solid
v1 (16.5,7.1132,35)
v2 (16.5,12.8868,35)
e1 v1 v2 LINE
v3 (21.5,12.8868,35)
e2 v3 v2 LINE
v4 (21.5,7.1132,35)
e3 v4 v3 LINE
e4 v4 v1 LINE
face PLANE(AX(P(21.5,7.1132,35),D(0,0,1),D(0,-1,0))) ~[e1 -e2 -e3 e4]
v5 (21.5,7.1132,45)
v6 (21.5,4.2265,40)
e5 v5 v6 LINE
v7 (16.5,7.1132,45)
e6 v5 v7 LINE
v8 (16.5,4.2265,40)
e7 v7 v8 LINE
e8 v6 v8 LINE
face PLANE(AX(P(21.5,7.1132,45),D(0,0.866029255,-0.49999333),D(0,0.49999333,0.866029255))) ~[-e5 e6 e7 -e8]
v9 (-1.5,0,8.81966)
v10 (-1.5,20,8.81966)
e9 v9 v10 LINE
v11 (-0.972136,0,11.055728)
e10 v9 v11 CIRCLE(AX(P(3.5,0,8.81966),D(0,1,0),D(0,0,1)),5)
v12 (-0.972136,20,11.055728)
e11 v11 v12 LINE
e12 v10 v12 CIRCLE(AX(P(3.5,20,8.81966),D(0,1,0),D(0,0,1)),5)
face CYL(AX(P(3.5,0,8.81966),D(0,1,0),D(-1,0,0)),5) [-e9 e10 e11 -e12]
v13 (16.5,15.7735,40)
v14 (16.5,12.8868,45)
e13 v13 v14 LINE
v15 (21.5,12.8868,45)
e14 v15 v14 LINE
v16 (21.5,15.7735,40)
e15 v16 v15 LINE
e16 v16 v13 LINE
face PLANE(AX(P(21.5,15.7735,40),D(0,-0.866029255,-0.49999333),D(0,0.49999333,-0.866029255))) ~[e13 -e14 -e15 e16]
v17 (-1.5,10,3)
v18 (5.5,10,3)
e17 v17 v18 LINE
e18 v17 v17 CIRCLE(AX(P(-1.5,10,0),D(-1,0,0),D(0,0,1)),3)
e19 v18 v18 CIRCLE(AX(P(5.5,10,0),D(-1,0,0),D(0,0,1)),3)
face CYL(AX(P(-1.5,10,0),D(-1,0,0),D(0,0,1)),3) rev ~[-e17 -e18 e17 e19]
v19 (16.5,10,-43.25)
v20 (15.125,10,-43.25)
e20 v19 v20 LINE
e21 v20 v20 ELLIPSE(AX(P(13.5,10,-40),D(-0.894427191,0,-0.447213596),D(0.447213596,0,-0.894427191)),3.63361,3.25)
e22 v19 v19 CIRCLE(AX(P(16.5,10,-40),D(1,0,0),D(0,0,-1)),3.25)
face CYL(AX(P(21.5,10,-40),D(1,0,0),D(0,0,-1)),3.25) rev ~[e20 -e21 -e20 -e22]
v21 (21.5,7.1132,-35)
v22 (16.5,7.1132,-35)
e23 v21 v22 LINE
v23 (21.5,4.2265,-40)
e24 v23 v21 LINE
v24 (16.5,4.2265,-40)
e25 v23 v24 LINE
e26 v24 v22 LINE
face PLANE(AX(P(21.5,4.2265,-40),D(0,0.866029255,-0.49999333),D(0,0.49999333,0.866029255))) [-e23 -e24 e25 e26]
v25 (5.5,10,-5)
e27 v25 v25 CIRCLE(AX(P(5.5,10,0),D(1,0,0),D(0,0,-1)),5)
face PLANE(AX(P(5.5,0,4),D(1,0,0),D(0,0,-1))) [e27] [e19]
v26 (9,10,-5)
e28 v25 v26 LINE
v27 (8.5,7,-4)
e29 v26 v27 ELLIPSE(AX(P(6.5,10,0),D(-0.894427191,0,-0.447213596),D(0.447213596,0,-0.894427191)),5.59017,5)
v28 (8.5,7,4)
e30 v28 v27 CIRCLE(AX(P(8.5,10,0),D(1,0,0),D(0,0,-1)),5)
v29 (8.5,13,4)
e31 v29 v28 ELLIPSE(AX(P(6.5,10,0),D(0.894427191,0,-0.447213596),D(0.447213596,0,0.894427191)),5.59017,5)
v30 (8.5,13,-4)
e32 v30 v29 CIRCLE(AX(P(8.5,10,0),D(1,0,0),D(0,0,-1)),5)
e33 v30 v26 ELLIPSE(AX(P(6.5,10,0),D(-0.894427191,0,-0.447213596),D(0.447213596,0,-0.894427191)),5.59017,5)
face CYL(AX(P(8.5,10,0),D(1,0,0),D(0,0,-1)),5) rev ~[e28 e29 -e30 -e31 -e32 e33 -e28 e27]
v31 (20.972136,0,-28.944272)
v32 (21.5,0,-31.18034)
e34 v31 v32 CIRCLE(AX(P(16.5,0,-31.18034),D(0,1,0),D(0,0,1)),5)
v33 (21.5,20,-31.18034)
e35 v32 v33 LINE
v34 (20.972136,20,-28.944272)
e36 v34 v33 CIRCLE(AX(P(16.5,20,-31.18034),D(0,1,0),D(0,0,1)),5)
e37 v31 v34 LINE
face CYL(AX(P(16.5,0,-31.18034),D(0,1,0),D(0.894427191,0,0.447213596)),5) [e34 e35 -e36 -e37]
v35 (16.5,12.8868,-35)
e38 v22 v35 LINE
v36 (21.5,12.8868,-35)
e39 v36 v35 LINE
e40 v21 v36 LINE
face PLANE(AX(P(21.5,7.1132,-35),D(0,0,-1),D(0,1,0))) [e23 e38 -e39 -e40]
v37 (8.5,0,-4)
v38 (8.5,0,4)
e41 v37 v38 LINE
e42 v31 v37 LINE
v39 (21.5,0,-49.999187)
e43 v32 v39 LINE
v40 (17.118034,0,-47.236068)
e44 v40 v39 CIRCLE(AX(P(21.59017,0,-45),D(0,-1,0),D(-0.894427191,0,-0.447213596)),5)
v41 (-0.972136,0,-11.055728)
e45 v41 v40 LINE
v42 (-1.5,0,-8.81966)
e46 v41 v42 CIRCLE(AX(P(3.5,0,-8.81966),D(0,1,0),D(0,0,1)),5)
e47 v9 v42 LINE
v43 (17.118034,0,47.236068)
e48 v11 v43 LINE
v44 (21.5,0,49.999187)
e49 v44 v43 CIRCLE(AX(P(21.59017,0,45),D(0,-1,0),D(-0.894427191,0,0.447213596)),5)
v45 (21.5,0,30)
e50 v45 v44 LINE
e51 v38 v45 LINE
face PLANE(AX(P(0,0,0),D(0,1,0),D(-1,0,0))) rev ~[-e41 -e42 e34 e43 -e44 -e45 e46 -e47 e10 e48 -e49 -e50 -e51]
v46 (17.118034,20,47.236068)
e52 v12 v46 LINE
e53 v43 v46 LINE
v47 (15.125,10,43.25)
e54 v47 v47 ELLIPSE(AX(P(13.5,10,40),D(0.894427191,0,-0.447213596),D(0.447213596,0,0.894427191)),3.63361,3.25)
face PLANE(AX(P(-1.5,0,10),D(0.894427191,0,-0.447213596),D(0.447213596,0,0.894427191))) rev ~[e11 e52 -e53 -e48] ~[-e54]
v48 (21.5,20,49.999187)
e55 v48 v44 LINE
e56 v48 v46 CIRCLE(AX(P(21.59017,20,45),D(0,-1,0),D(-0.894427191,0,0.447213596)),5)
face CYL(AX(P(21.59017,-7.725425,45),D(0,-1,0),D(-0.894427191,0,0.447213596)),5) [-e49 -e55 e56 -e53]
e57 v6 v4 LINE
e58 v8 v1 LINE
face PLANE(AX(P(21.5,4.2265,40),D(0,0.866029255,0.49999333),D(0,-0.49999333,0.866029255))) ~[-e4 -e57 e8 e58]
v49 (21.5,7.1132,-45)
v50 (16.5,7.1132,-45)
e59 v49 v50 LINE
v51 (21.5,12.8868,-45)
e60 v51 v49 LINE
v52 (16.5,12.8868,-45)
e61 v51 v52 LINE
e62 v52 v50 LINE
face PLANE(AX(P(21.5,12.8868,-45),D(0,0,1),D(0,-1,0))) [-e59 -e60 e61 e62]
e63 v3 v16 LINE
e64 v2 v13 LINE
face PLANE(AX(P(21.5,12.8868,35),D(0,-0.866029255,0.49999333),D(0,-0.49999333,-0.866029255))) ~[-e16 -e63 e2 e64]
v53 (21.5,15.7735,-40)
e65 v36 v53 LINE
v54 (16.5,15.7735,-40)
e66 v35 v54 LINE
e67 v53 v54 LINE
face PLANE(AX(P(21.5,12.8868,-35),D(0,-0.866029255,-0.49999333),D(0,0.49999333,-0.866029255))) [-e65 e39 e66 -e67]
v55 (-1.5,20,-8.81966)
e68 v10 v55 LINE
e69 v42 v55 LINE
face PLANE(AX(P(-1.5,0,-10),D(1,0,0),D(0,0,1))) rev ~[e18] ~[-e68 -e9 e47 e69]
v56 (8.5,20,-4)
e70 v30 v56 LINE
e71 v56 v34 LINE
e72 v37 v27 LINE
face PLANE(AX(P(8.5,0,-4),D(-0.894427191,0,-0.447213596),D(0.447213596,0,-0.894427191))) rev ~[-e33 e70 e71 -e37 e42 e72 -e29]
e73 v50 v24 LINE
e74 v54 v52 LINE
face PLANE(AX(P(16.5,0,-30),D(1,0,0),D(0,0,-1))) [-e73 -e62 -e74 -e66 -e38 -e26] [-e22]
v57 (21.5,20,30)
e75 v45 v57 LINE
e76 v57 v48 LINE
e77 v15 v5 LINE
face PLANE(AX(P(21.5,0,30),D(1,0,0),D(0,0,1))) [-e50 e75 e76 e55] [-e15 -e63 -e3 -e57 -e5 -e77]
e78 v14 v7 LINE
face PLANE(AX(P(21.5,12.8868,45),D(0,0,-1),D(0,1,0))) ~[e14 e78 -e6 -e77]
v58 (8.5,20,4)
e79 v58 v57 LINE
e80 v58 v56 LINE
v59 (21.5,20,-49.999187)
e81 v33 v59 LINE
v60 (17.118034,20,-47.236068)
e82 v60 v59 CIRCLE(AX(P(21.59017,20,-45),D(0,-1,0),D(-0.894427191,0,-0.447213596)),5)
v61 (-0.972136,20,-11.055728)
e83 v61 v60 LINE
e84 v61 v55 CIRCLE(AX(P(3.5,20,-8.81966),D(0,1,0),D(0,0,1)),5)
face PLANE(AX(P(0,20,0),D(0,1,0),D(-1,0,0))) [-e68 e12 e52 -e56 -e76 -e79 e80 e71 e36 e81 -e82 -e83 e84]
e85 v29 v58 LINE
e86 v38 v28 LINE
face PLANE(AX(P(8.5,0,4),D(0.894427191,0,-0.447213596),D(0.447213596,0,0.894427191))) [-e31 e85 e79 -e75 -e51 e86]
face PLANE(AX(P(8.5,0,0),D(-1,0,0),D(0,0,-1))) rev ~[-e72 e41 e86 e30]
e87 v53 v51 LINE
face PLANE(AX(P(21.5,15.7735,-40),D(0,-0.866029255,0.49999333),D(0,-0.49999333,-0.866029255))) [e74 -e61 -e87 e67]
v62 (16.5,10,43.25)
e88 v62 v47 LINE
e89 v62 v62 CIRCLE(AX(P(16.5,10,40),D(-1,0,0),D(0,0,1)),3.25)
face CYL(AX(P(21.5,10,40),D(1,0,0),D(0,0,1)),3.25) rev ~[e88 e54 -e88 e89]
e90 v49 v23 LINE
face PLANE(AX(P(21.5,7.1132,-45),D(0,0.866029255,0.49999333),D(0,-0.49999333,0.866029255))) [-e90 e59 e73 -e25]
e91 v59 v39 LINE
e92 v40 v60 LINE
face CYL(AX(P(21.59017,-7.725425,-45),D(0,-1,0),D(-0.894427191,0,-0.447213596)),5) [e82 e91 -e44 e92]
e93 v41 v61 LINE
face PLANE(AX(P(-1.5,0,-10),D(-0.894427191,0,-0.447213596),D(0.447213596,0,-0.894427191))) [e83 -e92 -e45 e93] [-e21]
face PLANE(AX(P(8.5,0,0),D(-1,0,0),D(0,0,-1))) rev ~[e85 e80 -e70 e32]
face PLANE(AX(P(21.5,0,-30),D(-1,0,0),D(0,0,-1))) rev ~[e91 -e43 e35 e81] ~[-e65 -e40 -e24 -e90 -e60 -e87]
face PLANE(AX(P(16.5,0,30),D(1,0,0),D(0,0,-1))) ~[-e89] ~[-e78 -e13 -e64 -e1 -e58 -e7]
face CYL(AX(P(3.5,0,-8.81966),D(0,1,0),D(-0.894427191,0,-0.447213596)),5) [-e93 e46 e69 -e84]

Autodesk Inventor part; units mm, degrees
ref_plane "YZ Plane" through (0, 0, 0) normal (1, 0, 0) x (0, 1, 0)
ref_plane "XZ Plane" through (0, 0, 0) normal (0, 1, 0) x (-1, 0, 0)
ref_plane "XY Plane" through (0, 0, 0) normal (0, 0, 1) x (1, 0, 0)
sketch "Sketch1" plane through (0, 0, 0) normal (0, 1, 0) x (-1, 0, 0)
  line L0 (0, 0) -> (-20, 0)
  line L1 (-20, 0) -> (-20, -40)
  line L2 (-20, -40) -> (0, 0)
  line L3 (-21.5, -50) -> (-18.5, -50)
  line L4 (-18.5, -50) -> (-18.5, -30)
  line L5 (-18.5, -30) -> (-21.5, -30)
  line L6 (-21.5, -30) -> (-21.5, -50)
  line L7 (-21.5, -50) -> (-18.5, -30) construction
  line L8 (-18.5, -50) -> (-21.5, -30) construction
  line L9 (1.5, 10) -> (-1.5, 10)
  line L10 (-1.5, 10) -> (-1.5, -10)
  line L11 (-1.5, -10) -> (1.5, -10)
  line L12 (1.5, -10) -> (1.5, 10)
  line L13 (1.5, 10) -> (-1.5, -10) construction
  line L14 (-1.5, 10) -> (1.5, -10) construction
  line L15 (-1.5, 10) -> (-21.5, -30)
  line L16 (1.5, -10) -> (-18.5, -50)
  line L17 (1.5, -10) -> (1.5, 10)
  line L18 (1.5, -10) -> (1.5, 10)
  line L19 (1.5, 10) -> (-8.5, 10)
  line L20 (-8.5, 10) -> (-8.5, -10)
  line L21 (-8.5, -10) -> (1.5, -10)
  line L22 (1.5, -10) -> (1.5, 10)
  line L23 (0, 0) -> (10, 0)
  line L24 (0, 0) -> (10, 0) construction
  line L25 (-20, 40) -> (0, 0)
  line L26 (-21.5, 50) -> (-18.5, 50)
  line L27 (-18.5, 50) -> (-18.5, 30)
  line L28 (-18.5, 30) -> (-21.5, 30)
  line L29 (-21.5, 30) -> (-21.5, 50)
  line L30 (-1.5, -10) -> (-1.5, 10)
  line L31 (-1.5, 10) -> (1.5, 10)
  line L32 (-1.5, -10) -> (-21.5, 30)
  line L33 (1.5, 10) -> (-18.5, 50)
  line L34 (1.5, 10) -> (1.5, -10)
  point P0 (-7.3579, -1.7157)
  point P1 (-11.5, -10)
  point P2 (-11.5, -10)
  point P3 (-8.5, -4)
  point P4 (-8.5, 4)
  dimension "d0" = 20
  dimension "d1" = 40
  dimension "d2" = 3
  dimension "d3" = 20
  dimension "d4" = 3
  dimension "d5" = 20
  dimension "d31" = 10
  dimension "d32" = 20
  dimension "d42" = 10
  dimension "d43" = 0
extrude "Extrusion1" add sketch "Sketch1" along normal blind 20 contours L2 L10 L0 | L23 L12 L11 L10 L2 | L25 L10 L9 L12 L23 | L0 L10 L25 | L10 L2 L32 L0 | L0 L15 L25 L10 | L10 L32 L2 | L25 L15 L10 | L15 L20 L0 | L32 L20 L19 L25 L15 | L32 L2 L21 L20 L15 | L0 L20 L32 | L32 L21 L2 | L11 L16 L4 L2 L21 | L9 L19 L25 L27 L33 | L15 L25 L19 | L20 L21 L2 L4 L5 L1 L15 | L32 L28 L27 L25 L19 L20 | L3 L6 L5 L1 L2 L4 | L27 L28 L29 L26 | L1 L5 L15 | L2 L1 L5 L4
sketch "Sketch2" plane through (-1.5, 0, -10) normal (-1, 0, 0) x (0, 0, 1)
  circle A0 centre (10, 10) radius 3
  line L0 (0, 0) -> (20, 0) projected
  line L1 (20, 0) -> (20, 20) projected
  point P0 (10, 0)
  dimension "d8" = 6
  dimension "d9" = 10
  dimension "d44" = 10
sketch "Sketch3" plane through (21.5, 0, -30) normal (1, 0, 0) x (0, 0, -1)
  circle A0 centre (10, 10) radius 3.25
  line L0 (0, 20) -> (20, 20) projected
  line L1 (20, 0) -> (20, 20) projected
  point P0 (-30, 0)
  dimension "d11" = 6.5
  dimension "d12" = 10
  dimension "d13" = 10
extrude "Extrusion2" cut sketch "Sketch2" against normal through all
extrude "Extrusion3" cut sketch "Sketch3" against normal through all
sketch "Sketch4" plane through (21.5, 0, -30) normal (1, 0, 0) x (0, 0, -1)
  circle A0 centre (10, 10) radius 3.25 projected
  line L0 (10, 15.7735) -> (15, 12.8868)
  line L1 (15, 12.8868) -> (15, 7.1132)
  line L2 (15, 7.1132) -> (10, 4.2265)
  line L3 (10, 4.2265) -> (5, 7.1132)
  line L4 (5, 7.1132) -> (5, 12.8868)
  line L5 (5, 12.8868) -> (10, 15.7735)
  line L6 (20, 0) -> (20, 20) projected
  point P0 (-30, 0)
  point P1 (10, 10)
  dimension "d19" = 10
extrude "Extrusion4" cut sketch "Sketch4" against normal blind 5
fillet "Fillet2" radius 5 1 edges at (21.5, 10, -30)
mirror "Mirror1" about plane through (0, 0, 0) normal (0, 0, 1) of "Extrusion4", "Extrusion3"
sketch "Sketch7" plane through (8.5, 0, 4) normal (1, 0, 0) x (0, 0, -1)
  circle A0 centre (4, 10) radius 3 projected
  circle A1 centre (4, 10) radius 5
  point P0 (4, 0)
  dimension "d52" = 10
extrude "Extrusion6" cut sketch "Sketch7" along normal mid plane 6 contours A0 | A1
fillet "Fillet8" radius 5 2 edges at (-1.5, 10, 10) (-1.5, 10, -10)
fillet "Fillet9" radius 5 2 edges at (18.5, 10, 50) (18.5, 10, -50)
ref_plane "Work Plane1" through (0, 0, 0) normal (0, 0, 1) x (1, 0, 0)
properties part number "Bottom_Foot_Standoff" material "PET Plastic"
